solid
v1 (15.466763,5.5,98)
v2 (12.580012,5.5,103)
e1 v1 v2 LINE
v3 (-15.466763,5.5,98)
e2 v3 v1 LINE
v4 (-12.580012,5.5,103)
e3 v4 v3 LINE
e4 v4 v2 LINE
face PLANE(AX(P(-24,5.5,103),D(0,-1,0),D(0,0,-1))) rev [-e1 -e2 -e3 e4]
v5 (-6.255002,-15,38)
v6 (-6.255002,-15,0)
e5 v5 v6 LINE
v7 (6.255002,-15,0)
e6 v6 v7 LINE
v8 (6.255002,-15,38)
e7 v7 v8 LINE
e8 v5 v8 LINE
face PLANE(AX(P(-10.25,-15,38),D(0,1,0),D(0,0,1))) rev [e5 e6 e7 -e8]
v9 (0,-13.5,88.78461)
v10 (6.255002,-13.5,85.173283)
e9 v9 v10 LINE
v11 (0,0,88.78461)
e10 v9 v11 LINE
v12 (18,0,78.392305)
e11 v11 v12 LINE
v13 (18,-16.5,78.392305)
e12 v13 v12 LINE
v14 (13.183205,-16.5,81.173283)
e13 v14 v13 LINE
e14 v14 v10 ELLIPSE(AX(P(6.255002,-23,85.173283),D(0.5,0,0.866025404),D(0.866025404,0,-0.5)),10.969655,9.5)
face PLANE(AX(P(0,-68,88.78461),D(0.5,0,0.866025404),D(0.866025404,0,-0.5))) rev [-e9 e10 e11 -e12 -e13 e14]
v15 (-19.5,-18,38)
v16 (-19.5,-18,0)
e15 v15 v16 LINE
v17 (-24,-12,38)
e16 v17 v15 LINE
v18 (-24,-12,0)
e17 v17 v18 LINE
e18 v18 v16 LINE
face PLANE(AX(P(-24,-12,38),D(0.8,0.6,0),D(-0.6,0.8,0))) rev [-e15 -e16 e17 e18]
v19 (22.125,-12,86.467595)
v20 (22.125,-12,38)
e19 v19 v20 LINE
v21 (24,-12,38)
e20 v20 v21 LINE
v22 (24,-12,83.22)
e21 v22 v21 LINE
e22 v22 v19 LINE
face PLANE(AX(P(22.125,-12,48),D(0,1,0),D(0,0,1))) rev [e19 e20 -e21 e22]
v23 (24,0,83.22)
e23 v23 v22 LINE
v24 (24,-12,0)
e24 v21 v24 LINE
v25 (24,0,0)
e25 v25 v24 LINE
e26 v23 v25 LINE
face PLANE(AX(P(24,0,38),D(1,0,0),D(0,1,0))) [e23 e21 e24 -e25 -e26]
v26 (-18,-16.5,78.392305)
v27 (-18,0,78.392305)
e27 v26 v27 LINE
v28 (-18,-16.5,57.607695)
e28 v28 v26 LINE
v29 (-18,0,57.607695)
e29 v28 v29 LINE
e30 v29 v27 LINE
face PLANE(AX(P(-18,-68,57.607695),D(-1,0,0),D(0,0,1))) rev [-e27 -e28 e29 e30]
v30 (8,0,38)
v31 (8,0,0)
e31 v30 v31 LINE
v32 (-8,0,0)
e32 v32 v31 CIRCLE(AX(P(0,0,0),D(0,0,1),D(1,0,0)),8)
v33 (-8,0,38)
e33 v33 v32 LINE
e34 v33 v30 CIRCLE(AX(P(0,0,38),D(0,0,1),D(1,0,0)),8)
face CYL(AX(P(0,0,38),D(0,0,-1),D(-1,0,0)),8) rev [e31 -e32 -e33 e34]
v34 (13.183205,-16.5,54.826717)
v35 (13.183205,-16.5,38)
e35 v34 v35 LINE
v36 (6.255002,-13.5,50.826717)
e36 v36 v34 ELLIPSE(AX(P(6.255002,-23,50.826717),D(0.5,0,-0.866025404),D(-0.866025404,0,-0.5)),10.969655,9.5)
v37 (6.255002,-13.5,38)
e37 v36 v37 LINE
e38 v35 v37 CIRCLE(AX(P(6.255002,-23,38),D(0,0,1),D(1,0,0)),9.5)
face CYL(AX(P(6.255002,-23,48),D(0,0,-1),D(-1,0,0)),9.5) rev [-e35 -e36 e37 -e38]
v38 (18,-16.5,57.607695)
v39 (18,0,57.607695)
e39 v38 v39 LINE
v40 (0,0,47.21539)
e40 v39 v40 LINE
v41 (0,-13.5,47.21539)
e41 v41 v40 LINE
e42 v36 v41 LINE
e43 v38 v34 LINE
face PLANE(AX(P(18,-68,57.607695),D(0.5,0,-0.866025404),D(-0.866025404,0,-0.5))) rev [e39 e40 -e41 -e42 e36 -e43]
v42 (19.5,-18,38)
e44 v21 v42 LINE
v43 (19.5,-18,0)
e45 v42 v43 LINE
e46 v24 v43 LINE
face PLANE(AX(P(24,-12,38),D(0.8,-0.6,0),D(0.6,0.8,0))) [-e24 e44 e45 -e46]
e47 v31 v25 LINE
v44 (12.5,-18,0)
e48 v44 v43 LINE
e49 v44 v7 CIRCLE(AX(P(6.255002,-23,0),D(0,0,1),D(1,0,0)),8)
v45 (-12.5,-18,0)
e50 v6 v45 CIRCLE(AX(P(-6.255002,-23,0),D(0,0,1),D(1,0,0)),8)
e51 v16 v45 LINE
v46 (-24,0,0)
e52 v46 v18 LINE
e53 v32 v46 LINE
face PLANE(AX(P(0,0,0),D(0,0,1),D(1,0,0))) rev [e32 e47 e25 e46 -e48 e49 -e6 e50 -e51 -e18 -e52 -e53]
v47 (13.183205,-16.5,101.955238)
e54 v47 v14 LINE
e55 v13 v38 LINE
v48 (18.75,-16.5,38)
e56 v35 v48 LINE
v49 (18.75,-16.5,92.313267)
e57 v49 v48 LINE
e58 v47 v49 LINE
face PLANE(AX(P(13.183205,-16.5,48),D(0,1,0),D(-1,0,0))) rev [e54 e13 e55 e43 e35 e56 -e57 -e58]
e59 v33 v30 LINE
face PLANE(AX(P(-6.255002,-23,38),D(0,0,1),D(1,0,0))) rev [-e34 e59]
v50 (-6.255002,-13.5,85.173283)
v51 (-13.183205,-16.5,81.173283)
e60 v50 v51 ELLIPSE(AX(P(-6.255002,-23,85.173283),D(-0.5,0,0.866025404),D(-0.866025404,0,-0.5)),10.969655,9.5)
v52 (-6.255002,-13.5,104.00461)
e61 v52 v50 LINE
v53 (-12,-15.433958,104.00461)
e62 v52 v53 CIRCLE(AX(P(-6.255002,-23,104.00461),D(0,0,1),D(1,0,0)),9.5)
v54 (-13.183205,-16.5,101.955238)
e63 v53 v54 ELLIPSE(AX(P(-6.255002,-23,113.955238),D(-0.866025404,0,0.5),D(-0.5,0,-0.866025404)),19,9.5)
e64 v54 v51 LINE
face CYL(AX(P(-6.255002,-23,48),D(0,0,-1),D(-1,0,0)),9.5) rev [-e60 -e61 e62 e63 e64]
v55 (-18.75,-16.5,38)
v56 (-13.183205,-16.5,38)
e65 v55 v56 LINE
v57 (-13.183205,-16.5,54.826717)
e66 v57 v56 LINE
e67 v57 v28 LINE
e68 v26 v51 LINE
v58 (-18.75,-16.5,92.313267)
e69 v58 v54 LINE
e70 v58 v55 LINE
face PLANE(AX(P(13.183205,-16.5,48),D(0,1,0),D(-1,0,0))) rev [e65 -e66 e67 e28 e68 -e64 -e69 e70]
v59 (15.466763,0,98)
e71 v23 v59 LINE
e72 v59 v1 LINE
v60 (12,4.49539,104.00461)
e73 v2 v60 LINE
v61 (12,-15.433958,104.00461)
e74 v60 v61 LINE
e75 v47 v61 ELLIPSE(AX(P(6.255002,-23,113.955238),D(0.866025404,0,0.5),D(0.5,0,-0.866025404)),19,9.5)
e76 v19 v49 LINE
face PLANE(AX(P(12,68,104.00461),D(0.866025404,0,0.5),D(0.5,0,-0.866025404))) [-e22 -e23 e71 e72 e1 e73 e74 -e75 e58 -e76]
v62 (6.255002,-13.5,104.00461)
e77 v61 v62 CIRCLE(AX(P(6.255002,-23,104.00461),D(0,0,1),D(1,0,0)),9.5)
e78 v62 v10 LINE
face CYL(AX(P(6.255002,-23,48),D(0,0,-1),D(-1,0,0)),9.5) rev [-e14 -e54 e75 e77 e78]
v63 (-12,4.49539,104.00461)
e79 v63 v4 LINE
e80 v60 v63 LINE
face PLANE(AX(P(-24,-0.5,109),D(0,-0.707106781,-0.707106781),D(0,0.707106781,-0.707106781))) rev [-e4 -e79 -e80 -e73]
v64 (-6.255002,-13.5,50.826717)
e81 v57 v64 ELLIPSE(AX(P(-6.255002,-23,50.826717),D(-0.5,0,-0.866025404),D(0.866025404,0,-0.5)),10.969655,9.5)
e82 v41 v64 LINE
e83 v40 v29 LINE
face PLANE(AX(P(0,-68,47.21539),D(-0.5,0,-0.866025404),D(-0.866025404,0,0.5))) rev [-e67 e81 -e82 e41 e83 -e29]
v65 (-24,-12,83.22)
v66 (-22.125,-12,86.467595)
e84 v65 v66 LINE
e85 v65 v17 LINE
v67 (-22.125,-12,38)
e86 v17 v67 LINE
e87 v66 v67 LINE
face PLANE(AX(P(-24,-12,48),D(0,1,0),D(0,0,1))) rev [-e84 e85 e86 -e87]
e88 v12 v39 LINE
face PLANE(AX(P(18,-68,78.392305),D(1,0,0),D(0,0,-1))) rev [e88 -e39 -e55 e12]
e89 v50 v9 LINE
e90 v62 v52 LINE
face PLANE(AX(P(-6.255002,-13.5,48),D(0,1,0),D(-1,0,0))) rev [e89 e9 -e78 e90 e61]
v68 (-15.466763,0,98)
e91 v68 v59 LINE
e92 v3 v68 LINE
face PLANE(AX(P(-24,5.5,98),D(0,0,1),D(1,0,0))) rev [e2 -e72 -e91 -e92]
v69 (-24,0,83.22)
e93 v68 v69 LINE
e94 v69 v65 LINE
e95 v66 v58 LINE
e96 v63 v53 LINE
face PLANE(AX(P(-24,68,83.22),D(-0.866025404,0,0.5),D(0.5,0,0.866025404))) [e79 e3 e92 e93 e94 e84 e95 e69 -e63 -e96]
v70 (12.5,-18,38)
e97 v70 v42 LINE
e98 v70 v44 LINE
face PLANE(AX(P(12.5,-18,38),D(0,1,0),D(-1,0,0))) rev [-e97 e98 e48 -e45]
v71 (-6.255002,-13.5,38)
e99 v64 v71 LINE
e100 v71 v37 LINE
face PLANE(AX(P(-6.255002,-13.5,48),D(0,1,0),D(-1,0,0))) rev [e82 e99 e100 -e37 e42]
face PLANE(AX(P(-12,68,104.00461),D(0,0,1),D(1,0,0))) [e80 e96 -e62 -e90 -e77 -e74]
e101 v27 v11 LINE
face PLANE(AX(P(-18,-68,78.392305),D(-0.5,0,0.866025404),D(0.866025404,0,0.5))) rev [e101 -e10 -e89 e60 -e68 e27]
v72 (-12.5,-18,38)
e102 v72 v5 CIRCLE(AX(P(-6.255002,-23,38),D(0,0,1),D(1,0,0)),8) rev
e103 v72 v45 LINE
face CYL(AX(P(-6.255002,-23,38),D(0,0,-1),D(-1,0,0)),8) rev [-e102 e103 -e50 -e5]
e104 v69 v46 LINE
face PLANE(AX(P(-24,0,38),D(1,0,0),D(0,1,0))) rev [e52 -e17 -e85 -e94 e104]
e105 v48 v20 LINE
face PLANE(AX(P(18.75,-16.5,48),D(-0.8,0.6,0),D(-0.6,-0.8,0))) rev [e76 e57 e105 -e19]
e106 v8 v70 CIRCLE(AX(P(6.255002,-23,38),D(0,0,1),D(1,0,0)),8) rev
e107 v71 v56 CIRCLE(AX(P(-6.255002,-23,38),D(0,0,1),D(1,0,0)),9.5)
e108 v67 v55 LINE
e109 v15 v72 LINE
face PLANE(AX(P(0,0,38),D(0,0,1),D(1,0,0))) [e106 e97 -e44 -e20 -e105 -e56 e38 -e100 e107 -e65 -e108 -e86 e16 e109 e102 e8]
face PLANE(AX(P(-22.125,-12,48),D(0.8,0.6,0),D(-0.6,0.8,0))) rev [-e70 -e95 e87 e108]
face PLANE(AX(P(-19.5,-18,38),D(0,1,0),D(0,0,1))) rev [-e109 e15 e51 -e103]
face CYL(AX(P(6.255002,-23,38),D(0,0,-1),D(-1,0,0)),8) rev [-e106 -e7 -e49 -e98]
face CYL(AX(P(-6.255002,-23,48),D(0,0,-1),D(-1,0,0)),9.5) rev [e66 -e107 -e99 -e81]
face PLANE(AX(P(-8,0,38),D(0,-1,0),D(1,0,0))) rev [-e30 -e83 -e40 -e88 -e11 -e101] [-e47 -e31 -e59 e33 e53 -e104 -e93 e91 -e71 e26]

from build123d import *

# Parameters (mm, degrees)
Y_KSEKLIK_EKSTR_ZYON1_DEPTH = 38
RADYUS3_R                   = 8
Y_KSEKLIK_EKSTR_ZYON2_DEPTH = 10
Y_KSEKLIK_EKSTR_ZYON3_DEPTH = 24
KES_EKSTR_ZYON1_DEPTH       = 68
KES_EKSTR_ZYON3_DEPTH       = 68
KES_EKSTR_ZYON3_DEPTH_BACK  = 68
KES_EKSTR_ZYON4_DEPTH       = 68
KES_EKSTR_ZYON7_DEPTH       = 68


with BuildPart() as part:
    # Çizim1 → Yükseklik-Ekstrüzyon1 (new body)
    with BuildSketch(Plane.XY):
        with BuildLine():
            Line((-8, 0), (-24, 0))
            Line((-24, 0), (-24, -12))
            Line((-24, -12), (-19.5, -18))
            Line((-19.5, -18), (-12.5, -18))
            Line((-12.5, -18), (-10.25, -15))
            Line((-10.25, -15), (10.25, -15))
            Line((10.25, -15), (12.5, -18))
            Line((12.5, -18), (19.5, -18))
            Line((19.5, -18), (24, -12))
            Line((24, -12), (24, 0))
            Line((24, 0), (8, 0))
            ThreePointArc((8, 0), (0, -8), (-8, 0))
        make_face()
    extrude(amount=Y_KSEKLIK_EKSTR_ZYON1_DEPTH)

    # Radyus3
    # the kernel refuses this fillet: 8 mm, written as the material it adds along each edge
    with BuildSketch(Plane(origin=(10.25, -15, 0), x_dir=(-1, 0, 0), z_dir=(0, 0, 1))) as radyus3_piece_1:
        with BuildLine():
            CenterArc((3.994997998, 8), RADYUS3_R, 218.682187453, 51.317812547)
            Line((-2.25, 3), (-2.37489996, 2.9))
            ThreePointArc((-2.37489996, 2.9), (-1.253, 1.404), (-0.128, -0.096))
            Line((-0.128, -0.096), (0, -0.16))
            Line((0, -0.16), (3.994997998, -0.16))
            Line((3.994997998, -0.16), (3.994997998, 0))
        make_face()
    extrude(amount=38)
    with BuildSketch(Plane(origin=(-10.25, -15, 0), x_dir=(-0.5999999999999978, -0.8000000000000017, 0), z_dir=(0, 0, 1))) as radyus3_piece_2:
        with BuildLine():
            CenterArc((4.003001201, 7.995998399), RADYUS3_R, 216.869897646, 51.317812547)
            Line((-2.396998799, 3.195998399), (-2.524998799, 3.099998399))
            Line((-2.524998799, 3.099998399), (-0.128, -0.096))
            Line((-0.128, -0.096), (0, -0.16))
            ThreePointArc((0, -0.16), (1.875, -0.16), (3.744939976, -0.159919968))
            Line((3.744939976, -0.159919968), (3.75, 0))
        make_face()
    extrude(amount=38)

    # Çizim2 → Yükseklik-Ekstrüzyon2 (add)
    with BuildSketch(Plane.XY.offset(38)):
        with BuildLine():
            Line((22.125, -12), (24, -12))
            Line((24, -12), (24, 0))
            Line((24, 0), (-24, 0))
            Line((-24, 0), (-24, -12))
            Line((-24, -12), (-22.125, -12))
            Line((-22.125, -12), (-18.75, -16.5))
            Line((-18.75, -16.5), (-13.183205232, -16.5))
            ThreePointArc((-13.183205232, -16.5), (-10.029919219, -14.282202113), (-6.255002002, -13.5))
            Line((-6.255002002, -13.5), (6.255002002, -13.5))
            ThreePointArc((6.255002002, -13.5), (10.029919219, -14.282202113), (13.183205232, -16.5))
            Line((13.183205232, -16.5), (18.75, -16.5))
            Line((18.75, -16.5), (22.125, -12))
        make_face()
    extrude(amount=Y_KSEKLIK_EKSTR_ZYON2_DEPTH)

    # Çizim4 → Yükseklik-Ekstrüzyon3 (add, symmetric)
    with BuildSketch(Plane(origin=(0, 0, 0), x_dir=(0, 0, -1), z_dir=(1, 0, 0))):
        Polygon((-109, -10.5), (-103, -16.5), (-48, -16.5), (-48, 0), (-98, 0), (-98, 5.5), (-103, 5.5), (-109, -0.5), align=None)
    extrude(amount=Y_KSEKLIK_EKSTR_ZYON3_DEPTH, both=True)

    # Çizim5 → Kes-Ekstrüzyon1 (cut)
    with BuildSketch(Plane(origin=(0, 0, 48), x_dir=(-1, 0, 0), z_dir=(0, 0, -1))):
        Polygon((24, -16.5), (24, -12), (22.125, -12), (18.75, -16.5), align=None)
    extrude(amount=-KES_EKSTR_ZYON1_DEPTH, mode=Mode.SUBTRACT)

    # Çizim6 → Kes-Ekstrüzyon3 (cut, two sides: drawn at the far end of the back side and taken through both)
    with BuildSketch(Plane(origin=(0, 0, 0), x_dir=(1, 0, 0), z_dir=(0, 1, 0)).offset(-KES_EKSTR_ZYON3_DEPTH_BACK)):
        Polygon((-24, -83.22), (-34.13268128, -83.22), (-34.13268128, -122.200491655), (32.816911355, -122.200491655), (32.816911355, -83.22), (24, -83.22), (12, -104.004609691), (-12, -104.004609691), align=None)
    extrude(amount=KES_EKSTR_ZYON3_DEPTH + KES_EKSTR_ZYON3_DEPTH_BACK, mode=Mode.SUBTRACT)

    # Çizim7 → Kes-Ekstrüzyon4 (cut)
    with BuildSketch(Plane(origin=(0, 0, 48), x_dir=(-1, 0, 0), z_dir=(0, 0, -1))):
        with BuildLine():
            Line((6.255002002, -13.5), (-6.255002002, -13.5))
            ThreePointArc((-6.255002002, -13.5), (-10.029919219, -14.282202113), (-13.183205232, -16.5))
            Line((-13.183205232, -16.5), (13.183205232, -16.5))
            ThreePointArc((13.183205232, -16.5), (10.029919219, -14.282202113), (6.255002002, -13.5))
        make_face()
        Polygon((-24, -16.5), (-18.75, -16.5), (-22.125, -12), (-24, -12), align=None)
    extrude(amount=-KES_EKSTR_ZYON4_DEPTH, mode=Mode.SUBTRACT)

    # Çizim9 → Kes-Ekstrüzyon7 (cut)
    with BuildSketch(Plane(origin=(0, 0, 0), x_dir=(1, 0, 0), z_dir=(0, 1, 0))):
        Polygon((0, -47.215390309), (-18, -57.607695155), (-18, -78.392304845), (0, -88.784609691), (18, -78.392304845), (18, -57.607695155), align=None)
    extrude(amount=-KES_EKSTR_ZYON7_DEPTH, mode=Mode.SUBTRACT)


solid = part.part
